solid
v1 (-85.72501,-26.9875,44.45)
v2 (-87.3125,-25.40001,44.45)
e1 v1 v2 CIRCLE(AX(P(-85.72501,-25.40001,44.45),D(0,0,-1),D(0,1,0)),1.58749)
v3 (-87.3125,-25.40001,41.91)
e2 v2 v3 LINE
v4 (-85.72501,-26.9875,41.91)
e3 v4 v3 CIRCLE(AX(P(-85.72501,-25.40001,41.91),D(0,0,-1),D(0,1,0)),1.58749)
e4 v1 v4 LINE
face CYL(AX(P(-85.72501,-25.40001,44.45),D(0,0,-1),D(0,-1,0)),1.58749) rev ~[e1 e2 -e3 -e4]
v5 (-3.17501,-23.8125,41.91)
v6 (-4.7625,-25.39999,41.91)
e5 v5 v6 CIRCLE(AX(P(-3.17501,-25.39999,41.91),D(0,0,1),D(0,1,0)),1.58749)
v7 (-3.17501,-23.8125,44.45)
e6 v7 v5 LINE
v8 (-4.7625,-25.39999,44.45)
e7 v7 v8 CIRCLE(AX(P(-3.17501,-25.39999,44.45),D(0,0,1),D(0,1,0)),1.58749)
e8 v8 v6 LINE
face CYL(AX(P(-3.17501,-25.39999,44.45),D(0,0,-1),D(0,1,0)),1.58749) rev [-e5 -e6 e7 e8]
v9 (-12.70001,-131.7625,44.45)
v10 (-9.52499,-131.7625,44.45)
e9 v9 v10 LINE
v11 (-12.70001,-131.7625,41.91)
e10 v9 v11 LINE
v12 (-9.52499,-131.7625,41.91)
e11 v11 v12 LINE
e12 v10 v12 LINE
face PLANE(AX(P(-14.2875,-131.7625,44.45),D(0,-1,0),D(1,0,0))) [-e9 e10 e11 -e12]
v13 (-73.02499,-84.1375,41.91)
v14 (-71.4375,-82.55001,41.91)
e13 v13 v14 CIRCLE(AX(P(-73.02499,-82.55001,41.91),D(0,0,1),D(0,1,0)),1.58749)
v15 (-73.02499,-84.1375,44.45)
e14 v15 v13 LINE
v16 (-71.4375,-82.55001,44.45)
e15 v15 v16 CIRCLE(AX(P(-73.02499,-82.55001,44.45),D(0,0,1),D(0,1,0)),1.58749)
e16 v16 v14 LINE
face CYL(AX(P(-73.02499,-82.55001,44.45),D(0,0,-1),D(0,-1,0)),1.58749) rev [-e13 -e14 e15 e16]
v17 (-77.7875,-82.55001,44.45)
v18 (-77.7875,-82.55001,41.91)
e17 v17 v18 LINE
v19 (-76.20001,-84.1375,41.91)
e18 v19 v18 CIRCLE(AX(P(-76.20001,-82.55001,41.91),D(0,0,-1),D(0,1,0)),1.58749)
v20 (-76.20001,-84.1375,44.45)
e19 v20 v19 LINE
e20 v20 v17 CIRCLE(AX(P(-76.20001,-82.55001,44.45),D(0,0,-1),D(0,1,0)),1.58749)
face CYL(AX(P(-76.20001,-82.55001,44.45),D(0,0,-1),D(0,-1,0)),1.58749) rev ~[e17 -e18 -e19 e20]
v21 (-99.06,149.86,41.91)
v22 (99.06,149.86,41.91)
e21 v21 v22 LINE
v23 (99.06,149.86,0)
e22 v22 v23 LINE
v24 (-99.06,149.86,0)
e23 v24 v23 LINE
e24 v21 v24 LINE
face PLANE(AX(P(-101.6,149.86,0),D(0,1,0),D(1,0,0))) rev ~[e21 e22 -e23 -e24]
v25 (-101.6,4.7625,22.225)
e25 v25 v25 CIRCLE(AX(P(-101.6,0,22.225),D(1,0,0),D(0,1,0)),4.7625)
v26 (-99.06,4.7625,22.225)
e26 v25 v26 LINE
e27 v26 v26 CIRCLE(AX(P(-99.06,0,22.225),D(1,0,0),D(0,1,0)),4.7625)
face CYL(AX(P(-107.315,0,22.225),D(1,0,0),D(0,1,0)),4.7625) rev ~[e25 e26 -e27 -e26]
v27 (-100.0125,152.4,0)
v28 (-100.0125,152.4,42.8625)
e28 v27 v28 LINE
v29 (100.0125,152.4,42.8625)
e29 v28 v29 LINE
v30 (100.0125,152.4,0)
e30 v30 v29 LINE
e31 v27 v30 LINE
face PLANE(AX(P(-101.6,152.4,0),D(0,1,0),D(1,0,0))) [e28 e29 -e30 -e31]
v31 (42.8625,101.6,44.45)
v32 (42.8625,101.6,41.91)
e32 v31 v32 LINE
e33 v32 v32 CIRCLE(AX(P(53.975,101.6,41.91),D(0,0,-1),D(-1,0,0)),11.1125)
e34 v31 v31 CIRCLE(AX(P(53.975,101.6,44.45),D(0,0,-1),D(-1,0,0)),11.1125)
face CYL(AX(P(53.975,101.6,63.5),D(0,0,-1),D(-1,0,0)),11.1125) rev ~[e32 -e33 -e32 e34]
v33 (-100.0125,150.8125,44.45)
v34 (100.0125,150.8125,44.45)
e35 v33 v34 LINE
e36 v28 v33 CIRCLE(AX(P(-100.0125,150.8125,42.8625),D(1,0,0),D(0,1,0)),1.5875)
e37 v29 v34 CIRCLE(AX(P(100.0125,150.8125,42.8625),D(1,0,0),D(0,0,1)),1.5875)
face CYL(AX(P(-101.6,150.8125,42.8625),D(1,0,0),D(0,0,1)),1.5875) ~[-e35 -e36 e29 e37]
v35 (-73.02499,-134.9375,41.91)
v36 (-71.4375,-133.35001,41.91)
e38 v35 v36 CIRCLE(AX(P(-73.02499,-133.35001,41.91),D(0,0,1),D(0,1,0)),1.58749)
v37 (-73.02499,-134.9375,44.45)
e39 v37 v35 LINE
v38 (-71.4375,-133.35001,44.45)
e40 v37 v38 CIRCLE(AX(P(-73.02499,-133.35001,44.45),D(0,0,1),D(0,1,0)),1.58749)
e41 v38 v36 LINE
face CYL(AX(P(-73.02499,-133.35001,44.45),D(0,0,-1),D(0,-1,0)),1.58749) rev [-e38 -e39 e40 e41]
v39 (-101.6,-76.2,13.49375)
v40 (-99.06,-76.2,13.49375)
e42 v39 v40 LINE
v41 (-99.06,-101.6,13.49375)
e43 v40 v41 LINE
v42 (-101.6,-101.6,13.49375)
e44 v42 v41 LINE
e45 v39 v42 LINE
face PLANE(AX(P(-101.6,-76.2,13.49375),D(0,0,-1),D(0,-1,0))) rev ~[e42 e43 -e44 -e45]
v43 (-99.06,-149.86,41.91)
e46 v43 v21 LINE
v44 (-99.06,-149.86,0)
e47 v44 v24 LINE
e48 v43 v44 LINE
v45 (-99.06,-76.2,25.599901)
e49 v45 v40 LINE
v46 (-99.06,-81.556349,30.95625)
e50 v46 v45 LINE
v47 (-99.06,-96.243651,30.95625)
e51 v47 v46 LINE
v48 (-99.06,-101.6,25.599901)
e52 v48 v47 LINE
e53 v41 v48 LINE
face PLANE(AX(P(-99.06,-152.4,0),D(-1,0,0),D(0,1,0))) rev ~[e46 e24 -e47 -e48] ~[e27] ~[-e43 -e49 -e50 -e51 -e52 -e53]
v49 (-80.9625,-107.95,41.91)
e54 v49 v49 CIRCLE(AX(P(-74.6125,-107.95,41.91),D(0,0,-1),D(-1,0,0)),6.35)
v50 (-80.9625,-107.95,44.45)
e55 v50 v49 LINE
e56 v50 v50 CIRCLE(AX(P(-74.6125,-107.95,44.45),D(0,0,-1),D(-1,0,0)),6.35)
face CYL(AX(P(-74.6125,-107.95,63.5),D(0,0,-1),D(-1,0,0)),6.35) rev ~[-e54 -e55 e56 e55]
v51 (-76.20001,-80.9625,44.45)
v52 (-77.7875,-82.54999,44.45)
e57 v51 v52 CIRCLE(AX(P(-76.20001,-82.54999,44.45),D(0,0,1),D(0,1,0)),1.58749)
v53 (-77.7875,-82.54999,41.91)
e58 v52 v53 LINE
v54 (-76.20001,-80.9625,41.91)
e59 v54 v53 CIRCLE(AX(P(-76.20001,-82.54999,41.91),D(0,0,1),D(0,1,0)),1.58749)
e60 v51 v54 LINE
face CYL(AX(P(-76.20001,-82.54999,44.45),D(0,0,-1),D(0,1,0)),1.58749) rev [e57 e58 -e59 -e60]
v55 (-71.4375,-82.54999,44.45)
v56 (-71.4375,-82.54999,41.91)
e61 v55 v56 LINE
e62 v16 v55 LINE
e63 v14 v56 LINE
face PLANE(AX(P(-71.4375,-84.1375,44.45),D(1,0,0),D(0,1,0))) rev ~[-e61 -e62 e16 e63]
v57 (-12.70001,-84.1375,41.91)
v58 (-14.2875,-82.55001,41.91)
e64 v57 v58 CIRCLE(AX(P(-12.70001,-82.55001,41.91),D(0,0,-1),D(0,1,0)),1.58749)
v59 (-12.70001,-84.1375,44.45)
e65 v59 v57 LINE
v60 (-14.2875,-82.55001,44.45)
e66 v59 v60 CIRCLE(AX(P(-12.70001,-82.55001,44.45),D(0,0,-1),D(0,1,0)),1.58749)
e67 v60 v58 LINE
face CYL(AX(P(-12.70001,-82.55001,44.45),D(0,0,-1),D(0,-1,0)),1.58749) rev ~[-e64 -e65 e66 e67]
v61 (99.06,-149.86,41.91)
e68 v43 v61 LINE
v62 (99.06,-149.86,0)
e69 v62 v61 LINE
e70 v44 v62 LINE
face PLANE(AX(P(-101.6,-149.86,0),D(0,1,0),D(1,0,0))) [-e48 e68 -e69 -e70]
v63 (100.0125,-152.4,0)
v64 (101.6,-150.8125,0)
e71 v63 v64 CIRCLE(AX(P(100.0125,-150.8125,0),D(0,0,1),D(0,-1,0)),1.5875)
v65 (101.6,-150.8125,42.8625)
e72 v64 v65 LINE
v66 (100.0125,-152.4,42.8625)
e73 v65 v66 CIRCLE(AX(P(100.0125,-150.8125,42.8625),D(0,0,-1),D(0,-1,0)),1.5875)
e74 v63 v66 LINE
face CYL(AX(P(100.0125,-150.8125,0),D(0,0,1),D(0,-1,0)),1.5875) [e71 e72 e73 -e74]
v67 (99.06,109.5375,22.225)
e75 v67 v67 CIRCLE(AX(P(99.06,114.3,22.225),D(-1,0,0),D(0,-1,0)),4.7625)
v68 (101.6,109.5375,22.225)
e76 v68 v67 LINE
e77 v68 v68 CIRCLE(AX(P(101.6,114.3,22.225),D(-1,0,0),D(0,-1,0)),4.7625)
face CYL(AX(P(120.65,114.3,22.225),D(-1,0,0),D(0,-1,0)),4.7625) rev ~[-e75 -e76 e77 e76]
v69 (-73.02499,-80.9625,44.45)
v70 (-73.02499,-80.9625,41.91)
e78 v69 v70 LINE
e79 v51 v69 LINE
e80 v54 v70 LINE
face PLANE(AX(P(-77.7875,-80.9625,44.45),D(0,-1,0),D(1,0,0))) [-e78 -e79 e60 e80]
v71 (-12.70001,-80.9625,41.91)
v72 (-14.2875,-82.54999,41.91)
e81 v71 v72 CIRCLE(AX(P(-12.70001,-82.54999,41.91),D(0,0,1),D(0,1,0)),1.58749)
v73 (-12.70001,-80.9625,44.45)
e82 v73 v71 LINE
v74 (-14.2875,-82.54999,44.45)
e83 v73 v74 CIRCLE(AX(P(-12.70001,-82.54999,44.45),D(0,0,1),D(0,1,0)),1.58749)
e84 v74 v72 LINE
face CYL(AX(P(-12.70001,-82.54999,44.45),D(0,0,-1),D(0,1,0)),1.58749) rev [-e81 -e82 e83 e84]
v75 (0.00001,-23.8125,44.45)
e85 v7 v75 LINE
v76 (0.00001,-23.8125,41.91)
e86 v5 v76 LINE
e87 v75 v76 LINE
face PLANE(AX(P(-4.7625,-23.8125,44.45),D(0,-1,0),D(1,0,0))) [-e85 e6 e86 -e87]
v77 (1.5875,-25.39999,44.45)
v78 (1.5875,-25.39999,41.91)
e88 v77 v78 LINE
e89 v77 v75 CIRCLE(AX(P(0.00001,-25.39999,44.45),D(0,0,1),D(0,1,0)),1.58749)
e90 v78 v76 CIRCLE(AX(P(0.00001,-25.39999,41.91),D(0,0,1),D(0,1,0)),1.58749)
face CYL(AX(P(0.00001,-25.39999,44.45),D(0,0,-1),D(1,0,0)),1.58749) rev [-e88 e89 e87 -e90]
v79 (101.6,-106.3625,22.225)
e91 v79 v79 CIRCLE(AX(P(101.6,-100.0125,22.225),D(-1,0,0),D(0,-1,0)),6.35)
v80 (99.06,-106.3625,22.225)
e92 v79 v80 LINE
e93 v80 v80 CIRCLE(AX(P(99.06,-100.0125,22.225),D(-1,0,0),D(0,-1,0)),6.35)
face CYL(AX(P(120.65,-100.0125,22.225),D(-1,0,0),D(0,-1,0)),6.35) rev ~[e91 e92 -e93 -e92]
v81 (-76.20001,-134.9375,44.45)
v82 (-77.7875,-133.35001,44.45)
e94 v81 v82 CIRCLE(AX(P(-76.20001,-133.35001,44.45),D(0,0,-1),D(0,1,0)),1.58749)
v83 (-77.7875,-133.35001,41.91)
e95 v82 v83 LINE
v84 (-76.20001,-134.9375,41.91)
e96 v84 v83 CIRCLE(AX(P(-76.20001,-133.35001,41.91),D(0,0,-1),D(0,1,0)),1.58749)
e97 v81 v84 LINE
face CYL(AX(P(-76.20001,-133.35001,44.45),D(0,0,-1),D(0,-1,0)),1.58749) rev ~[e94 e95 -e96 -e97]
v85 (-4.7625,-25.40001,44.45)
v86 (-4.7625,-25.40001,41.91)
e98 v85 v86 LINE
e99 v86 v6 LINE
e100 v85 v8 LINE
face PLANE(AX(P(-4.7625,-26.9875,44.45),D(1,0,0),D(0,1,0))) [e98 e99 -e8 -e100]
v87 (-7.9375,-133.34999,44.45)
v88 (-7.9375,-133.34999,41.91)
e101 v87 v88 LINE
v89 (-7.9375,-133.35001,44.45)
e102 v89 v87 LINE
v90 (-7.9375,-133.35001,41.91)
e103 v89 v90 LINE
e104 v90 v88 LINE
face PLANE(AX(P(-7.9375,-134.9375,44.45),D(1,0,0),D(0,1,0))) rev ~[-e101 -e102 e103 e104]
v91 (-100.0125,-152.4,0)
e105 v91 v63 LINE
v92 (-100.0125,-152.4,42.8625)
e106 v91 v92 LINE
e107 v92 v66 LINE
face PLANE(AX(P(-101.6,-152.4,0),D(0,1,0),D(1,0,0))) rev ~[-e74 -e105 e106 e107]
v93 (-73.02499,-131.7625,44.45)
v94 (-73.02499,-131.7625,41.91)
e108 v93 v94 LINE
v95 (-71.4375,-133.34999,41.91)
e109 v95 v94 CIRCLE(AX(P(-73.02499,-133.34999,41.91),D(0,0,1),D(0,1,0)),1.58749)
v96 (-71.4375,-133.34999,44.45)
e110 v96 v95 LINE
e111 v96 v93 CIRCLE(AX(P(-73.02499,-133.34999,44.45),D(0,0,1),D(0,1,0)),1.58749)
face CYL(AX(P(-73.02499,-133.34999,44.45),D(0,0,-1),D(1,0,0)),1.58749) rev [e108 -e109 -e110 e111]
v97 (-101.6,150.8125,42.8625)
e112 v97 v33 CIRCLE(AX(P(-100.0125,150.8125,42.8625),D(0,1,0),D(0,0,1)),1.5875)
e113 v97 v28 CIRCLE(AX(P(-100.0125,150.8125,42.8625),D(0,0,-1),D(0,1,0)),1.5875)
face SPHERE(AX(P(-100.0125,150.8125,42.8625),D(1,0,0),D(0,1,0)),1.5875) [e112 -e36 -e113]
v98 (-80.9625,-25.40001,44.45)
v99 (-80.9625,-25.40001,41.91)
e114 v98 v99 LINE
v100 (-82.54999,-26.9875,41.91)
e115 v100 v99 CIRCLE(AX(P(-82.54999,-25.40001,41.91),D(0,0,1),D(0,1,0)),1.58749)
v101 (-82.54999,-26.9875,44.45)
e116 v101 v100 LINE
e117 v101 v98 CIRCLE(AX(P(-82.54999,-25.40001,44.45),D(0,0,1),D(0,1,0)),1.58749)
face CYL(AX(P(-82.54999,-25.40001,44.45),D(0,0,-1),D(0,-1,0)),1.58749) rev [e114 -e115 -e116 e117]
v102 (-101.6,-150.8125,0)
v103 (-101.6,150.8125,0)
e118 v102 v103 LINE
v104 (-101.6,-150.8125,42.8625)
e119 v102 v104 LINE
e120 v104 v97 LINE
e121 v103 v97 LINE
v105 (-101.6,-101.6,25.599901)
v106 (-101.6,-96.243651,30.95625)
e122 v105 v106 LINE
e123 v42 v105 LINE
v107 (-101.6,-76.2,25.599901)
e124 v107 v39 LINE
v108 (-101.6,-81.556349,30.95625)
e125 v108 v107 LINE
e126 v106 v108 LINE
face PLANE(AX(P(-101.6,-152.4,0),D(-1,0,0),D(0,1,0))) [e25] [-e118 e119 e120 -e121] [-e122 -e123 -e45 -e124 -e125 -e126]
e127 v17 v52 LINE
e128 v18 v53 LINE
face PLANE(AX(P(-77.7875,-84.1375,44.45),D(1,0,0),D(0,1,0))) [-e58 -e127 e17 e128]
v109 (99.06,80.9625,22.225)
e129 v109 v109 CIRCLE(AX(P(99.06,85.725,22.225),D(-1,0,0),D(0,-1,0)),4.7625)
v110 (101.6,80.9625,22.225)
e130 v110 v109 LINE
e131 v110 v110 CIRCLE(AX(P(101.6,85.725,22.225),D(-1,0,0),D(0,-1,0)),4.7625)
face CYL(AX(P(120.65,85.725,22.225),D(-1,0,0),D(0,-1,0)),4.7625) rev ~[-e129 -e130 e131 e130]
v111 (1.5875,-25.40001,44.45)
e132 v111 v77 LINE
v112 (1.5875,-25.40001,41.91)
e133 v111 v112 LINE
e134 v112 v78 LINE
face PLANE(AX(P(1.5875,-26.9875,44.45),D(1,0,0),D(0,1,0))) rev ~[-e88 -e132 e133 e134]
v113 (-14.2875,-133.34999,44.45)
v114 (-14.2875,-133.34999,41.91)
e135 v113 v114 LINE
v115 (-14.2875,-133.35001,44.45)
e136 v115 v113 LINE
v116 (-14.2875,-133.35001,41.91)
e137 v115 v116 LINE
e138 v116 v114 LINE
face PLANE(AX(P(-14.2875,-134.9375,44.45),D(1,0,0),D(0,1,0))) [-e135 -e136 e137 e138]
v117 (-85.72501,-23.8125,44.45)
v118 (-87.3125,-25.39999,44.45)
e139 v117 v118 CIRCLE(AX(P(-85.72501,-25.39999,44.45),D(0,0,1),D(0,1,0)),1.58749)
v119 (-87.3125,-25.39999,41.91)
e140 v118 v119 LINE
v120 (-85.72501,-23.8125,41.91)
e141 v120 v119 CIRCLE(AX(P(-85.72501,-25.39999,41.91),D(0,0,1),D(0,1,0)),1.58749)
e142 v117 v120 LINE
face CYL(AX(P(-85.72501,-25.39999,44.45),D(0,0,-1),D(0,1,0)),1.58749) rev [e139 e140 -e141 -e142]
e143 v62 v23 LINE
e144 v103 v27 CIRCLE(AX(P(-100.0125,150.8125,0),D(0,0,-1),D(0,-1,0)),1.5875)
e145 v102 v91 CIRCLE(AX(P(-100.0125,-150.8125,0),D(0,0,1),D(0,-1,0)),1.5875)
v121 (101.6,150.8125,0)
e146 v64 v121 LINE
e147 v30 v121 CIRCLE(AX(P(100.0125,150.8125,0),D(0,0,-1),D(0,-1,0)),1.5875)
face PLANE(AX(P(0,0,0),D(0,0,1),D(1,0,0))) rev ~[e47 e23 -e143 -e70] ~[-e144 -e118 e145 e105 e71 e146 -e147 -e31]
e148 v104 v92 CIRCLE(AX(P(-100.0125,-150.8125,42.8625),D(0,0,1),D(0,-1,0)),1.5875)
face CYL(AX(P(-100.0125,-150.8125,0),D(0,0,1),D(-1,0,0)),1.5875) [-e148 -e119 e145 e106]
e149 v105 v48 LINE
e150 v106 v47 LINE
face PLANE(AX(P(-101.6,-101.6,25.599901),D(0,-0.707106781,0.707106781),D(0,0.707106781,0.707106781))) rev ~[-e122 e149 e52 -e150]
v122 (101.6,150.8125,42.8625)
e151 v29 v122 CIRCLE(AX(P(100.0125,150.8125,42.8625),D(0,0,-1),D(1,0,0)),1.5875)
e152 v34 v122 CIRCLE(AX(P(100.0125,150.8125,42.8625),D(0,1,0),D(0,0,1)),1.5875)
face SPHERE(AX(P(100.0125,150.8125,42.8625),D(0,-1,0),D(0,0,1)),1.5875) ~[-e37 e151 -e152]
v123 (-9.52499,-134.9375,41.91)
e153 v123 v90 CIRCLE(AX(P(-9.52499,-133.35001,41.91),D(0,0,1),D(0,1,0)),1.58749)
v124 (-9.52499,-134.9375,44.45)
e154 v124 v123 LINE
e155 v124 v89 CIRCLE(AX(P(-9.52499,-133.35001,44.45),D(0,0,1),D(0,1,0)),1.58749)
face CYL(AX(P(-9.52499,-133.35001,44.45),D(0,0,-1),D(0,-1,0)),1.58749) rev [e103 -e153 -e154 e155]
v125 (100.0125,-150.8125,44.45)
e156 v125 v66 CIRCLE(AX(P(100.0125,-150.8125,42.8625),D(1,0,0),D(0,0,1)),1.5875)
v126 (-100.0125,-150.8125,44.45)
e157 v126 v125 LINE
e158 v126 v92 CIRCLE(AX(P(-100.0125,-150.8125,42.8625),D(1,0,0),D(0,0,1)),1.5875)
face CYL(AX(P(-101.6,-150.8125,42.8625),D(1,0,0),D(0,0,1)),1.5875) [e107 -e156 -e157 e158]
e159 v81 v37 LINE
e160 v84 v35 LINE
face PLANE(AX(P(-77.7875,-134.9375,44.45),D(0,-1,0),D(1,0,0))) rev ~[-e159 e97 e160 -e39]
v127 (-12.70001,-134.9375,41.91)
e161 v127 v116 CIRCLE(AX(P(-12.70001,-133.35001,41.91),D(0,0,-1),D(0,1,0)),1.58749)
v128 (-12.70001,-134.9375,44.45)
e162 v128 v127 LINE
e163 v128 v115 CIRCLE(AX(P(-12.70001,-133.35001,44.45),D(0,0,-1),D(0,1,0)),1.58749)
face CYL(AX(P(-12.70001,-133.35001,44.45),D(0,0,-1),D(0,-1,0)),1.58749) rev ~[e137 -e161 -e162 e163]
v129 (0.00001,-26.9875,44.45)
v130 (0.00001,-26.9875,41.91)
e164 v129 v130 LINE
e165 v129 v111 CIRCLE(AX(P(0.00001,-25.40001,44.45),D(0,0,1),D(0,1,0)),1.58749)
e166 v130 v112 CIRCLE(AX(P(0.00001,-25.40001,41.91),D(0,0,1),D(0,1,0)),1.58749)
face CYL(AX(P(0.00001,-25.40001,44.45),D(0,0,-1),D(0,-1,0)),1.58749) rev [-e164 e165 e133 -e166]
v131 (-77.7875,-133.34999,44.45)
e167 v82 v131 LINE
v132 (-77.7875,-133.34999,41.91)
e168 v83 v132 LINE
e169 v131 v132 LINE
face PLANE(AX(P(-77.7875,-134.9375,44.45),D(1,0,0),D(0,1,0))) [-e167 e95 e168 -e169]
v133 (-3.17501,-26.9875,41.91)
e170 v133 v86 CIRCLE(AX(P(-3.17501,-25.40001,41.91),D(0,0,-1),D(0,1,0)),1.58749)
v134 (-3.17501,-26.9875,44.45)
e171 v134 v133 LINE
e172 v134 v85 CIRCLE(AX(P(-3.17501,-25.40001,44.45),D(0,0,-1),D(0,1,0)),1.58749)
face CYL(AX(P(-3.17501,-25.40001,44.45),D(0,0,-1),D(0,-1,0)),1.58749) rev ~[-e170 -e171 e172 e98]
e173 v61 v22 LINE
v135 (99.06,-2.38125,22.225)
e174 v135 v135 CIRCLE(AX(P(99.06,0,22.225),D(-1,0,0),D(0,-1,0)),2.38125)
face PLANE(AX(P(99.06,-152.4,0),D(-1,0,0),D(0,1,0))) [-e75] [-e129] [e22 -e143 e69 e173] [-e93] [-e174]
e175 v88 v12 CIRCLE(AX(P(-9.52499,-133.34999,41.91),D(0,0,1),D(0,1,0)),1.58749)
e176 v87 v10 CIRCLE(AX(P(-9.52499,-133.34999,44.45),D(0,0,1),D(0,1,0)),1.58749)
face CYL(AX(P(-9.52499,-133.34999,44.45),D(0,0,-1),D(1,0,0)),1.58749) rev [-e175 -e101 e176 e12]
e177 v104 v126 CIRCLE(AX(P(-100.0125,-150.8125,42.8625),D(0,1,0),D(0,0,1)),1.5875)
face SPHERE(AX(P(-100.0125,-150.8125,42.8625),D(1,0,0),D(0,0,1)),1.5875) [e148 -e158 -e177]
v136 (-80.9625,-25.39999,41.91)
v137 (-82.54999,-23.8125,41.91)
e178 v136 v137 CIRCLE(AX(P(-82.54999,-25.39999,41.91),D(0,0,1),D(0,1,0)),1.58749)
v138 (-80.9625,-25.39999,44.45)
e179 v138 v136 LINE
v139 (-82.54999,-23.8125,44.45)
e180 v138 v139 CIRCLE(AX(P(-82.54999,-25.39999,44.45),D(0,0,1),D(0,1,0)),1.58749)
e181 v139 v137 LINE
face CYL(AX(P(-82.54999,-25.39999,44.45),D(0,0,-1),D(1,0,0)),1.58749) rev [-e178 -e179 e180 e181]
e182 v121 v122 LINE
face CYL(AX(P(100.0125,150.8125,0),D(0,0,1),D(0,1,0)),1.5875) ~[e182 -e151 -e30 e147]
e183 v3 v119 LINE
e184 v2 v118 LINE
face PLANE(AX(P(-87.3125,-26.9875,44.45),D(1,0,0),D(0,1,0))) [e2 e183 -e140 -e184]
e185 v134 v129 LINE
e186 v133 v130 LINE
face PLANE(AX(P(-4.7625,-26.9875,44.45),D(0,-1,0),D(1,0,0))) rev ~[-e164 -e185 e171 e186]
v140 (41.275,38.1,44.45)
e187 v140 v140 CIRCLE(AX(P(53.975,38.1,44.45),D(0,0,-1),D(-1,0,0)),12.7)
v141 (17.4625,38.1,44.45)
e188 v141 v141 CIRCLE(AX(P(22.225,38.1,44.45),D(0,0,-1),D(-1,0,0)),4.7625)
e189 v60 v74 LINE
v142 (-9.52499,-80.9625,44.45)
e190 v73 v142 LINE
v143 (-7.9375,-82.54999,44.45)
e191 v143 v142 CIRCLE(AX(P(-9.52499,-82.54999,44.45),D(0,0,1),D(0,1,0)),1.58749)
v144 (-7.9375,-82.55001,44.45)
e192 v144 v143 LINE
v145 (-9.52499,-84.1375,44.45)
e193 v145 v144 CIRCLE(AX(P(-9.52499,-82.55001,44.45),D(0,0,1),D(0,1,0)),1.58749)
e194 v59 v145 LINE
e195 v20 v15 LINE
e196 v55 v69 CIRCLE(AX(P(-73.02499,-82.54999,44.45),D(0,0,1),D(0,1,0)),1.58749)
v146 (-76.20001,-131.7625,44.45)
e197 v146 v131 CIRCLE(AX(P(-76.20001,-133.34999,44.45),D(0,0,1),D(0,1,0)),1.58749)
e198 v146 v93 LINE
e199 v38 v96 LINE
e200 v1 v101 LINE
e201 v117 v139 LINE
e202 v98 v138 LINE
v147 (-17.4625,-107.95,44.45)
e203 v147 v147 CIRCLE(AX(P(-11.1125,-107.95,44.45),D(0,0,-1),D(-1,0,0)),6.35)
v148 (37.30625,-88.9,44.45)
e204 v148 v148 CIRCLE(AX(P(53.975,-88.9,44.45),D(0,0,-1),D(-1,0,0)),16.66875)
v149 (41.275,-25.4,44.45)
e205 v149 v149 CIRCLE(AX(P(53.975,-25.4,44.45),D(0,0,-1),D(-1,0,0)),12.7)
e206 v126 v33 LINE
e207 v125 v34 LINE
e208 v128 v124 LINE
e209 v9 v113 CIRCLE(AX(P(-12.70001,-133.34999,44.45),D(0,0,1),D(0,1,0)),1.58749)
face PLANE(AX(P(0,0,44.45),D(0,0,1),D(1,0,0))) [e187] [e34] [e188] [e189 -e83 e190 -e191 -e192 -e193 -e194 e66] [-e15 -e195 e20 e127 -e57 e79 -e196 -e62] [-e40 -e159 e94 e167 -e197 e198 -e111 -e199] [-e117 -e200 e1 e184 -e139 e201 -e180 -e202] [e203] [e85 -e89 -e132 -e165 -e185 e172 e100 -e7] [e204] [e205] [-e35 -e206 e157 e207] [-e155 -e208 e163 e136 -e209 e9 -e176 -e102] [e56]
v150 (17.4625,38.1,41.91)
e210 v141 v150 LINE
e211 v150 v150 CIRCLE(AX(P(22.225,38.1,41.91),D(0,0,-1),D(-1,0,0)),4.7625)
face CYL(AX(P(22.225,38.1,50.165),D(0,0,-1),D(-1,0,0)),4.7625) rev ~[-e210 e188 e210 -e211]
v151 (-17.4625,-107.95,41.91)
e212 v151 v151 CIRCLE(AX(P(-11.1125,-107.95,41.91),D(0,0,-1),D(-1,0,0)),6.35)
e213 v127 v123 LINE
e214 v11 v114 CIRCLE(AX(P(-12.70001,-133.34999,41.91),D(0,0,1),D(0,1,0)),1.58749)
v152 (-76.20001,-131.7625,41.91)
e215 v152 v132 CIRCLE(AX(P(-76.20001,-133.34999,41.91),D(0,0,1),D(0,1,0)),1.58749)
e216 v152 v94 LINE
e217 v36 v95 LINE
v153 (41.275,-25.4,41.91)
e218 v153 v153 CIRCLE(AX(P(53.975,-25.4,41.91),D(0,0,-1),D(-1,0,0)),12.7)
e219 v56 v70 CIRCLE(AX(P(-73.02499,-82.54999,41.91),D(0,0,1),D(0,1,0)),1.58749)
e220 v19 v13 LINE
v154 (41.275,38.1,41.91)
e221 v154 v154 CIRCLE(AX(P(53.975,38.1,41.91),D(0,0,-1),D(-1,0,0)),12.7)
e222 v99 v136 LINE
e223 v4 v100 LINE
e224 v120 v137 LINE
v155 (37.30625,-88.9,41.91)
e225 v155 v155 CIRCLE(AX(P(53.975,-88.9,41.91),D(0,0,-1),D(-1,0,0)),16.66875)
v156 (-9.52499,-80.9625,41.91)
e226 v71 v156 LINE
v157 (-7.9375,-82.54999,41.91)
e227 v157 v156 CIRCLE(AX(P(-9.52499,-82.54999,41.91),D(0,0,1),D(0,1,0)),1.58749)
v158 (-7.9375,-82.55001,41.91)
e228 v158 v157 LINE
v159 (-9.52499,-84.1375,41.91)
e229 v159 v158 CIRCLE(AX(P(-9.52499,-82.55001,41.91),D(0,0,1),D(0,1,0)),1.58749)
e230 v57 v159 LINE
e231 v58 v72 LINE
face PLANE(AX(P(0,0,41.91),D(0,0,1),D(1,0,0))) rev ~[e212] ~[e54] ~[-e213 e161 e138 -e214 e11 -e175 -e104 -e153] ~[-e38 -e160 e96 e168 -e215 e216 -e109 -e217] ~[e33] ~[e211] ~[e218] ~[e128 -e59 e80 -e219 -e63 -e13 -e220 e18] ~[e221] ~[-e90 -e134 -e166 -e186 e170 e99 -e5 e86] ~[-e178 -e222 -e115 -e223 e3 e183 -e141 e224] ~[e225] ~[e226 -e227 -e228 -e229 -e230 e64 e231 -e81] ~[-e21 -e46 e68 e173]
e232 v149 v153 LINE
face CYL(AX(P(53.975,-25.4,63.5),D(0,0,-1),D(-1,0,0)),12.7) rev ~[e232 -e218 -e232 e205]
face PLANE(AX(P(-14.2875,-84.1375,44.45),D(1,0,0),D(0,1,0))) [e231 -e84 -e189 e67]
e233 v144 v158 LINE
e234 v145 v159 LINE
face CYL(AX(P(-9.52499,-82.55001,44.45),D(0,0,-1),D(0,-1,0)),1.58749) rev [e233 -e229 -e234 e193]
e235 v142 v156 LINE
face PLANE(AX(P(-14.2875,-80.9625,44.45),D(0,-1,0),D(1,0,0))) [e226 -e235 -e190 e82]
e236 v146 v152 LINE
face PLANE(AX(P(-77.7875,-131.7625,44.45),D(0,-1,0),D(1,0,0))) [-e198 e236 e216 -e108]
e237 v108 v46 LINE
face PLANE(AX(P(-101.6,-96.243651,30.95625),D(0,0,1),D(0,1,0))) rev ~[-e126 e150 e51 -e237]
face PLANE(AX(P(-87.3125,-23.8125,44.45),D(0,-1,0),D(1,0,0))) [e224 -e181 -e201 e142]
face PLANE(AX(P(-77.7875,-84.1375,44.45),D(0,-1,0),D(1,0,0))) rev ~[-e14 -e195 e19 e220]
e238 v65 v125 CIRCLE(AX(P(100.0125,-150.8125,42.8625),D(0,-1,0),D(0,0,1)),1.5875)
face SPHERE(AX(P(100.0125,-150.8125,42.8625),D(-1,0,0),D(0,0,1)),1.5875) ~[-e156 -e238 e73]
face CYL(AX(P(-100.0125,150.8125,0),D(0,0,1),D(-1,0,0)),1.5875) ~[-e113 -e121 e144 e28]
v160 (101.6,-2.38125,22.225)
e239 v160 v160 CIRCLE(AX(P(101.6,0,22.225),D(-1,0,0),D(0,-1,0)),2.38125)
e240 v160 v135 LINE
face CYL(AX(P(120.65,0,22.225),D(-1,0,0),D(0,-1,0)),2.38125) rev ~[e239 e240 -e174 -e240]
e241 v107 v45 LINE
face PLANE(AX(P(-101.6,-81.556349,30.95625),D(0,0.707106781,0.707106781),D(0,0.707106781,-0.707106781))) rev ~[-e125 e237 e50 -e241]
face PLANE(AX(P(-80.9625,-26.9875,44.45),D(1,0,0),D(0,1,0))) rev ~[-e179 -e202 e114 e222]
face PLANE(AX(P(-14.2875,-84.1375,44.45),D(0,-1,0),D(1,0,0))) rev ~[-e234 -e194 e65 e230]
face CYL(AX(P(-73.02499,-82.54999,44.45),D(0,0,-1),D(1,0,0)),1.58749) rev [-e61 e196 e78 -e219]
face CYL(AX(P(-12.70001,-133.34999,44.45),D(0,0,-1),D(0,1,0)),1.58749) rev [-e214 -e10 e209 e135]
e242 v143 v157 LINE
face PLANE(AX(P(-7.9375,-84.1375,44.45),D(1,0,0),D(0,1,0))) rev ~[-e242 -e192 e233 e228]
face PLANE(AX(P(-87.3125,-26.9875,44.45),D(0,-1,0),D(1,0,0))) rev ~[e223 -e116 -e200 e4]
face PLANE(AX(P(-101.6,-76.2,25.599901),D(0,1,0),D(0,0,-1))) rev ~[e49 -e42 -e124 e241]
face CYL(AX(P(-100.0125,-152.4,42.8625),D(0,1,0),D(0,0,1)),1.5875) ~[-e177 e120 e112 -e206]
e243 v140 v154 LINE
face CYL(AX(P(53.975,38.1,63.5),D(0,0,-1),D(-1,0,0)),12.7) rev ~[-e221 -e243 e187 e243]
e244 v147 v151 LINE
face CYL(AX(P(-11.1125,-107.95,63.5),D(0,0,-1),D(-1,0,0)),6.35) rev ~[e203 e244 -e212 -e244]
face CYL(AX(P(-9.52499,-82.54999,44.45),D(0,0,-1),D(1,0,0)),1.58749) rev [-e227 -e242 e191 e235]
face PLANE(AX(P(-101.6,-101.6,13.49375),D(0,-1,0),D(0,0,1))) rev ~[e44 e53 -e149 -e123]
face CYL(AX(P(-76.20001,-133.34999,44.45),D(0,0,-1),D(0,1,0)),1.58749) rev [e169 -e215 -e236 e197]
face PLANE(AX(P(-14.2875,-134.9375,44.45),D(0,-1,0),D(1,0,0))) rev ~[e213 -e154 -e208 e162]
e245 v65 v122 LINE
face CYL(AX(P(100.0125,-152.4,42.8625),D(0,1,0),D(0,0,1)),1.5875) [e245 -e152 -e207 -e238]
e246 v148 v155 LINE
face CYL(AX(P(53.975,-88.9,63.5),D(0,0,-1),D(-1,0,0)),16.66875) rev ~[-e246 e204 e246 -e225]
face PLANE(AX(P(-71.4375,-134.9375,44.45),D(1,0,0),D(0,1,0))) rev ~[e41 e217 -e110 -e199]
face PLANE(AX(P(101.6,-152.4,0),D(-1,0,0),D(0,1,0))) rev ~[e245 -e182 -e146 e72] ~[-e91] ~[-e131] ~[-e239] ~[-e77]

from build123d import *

# Parameters (mm, degrees)
F0_W      = 203.2
F0_H      = 304.8
F1_DEPTH  = 44.45
F2_T      = -2.54
F3_W      = 6.35
F3_H      = 3.175
F4_DEPTH  = 25.4
F5_R      = 1.58749
F7_D      = 33.3375
F7_DEPTH  = 19.05
F7_TIP    = 10.0155954434
F8_D      = 25.4
F8_DEPTH  = 19.05
F8_TIP    = 7.6309298617
F9_D      = 22.225
F9_DEPTH  = 19.05
F9_TIP    = 6.6770636289
F11_D     = 4.7625
F11_DEPTH = 19.05
F11_TIP   = 1.4307993491
F12_D     = 9.525
F12_DEPTH = 19.05
F12_TIP   = 2.8615986981
F13_D     = 12.7
F13_DEPTH = 19.05
F13_TIP   = 3.8154649308
F15_DEPTH = 25.4
F16_D     = 12.7
F16_DEPTH = 19.05
F16_TIP   = 3.8154649308
F17_W     = 6.35
F17_H     = 3.175
F18_DEPTH = 25.4
F19_R     = 1.58749
F20_D     = 9.525
F20_DEPTH = 5.715
F20_TIP   = 2.8615986981
F21_D     = 9.525
F21_DEPTH = 5.715
F21_TIP   = 2.8615986981
F22_R     = 1.5875


# Not quite as in the source:
# - a fillet or chamfer is up to 0.001 mm smaller than in the source, because OpenCascade refuses the exact size


with BuildPart() as f1:
    # F0 (on Top) → F1 (new body)
    with BuildSketch(Plane.XY):
        Rectangle(F0_W, F0_H)
    extrude(amount=F1_DEPTH)

    # F2
    f2_openings = [f1.faces().sort_by_distance(p)[0] for p in [
        (0, 0, 0),
    ]]
    offset(amount=F2_T, openings=f2_openings)

    # F3 (on face) → F4 (cut)
    with BuildSketch(Plane.XY.offset(44.45)):
        with Locations((-74.6125, -133.35)):
            Rectangle(F3_W, F3_H)
        with Locations((-74.6125, -82.55)):
            Rectangle(F3_W, F3_H)
        with Locations((-11.1125, -82.55)):
            Rectangle(F3_W, F3_H)
        with Locations((-11.1125, -133.35)):
            Rectangle(F3_W, F3_H)
    extrude(amount=-F4_DEPTH, mode=Mode.SUBTRACT)

    # F5 (radius 1.5875 in the source; OpenCascade refuses exactly that, so slightly less here)
    f5_edges = [f1.edges().sort_by_distance(p)[0] for p in [
        (-77.7875, -131.7625, 43.18),
        (-14.2875, -131.7625, 43.18),
        (-77.7875, -80.9625, 43.18),
        (-71.4375, -80.9625, 43.18),
        (-7.9375, -80.9625, 43.18),
        (-7.9375, -131.7625, 43.18),
        (-71.4375, -131.7625, 43.18),
        (-14.2875, -134.9375, 43.18),
        (-77.7875, -134.9375, 43.18),
        (-77.7875, -84.1375, 43.18),
        (-14.2875, -84.1375, 43.18),
        (-7.9375, -134.9375, 43.18),
        (-7.9375, -84.1375, 43.18),
        (-71.4375, -84.1375, 43.18),
        (-71.4375, -134.9375, 43.18),
        (-14.2875, -80.9625, 43.18),
    ]]
    fillet(f5_edges, radius=F5_R)

    # F7
    with Locations(Plane.XY.offset(44.45)):
        with Locations((53.975, -88.9)):
            Hole(F7_D / 2, depth=F7_DEPTH)
            with Locations((0, 0, -(F7_DEPTH + F7_TIP / 2))):  # 118° drill point
                Cone(0, F7_D / 2, F7_TIP, mode=Mode.SUBTRACT)

    # F8
    with Locations(Plane.XY.offset(44.45)):
        with Locations((53.975, -25.4), (53.975, 38.1)):
            Hole(F8_D / 2, depth=F8_DEPTH)
            with Locations((0, 0, -(F8_DEPTH + F8_TIP / 2))):  # 118° drill point
                Cone(0, F8_D / 2, F8_TIP, mode=Mode.SUBTRACT)

    # F9
    with Locations(Plane.XY.offset(44.45)):
        with Locations((53.975, 101.6)):
            Hole(F9_D / 2, depth=F9_DEPTH)
            with Locations((0, 0, -(F9_DEPTH + F9_TIP / 2))):  # 118° drill point
                Cone(0, F9_D / 2, F9_TIP, mode=Mode.SUBTRACT)

    # F11
    with Locations(Plane.YZ.offset(101.6)):
        with Locations((0, 22.225)):
            Hole(F11_D / 2, depth=F11_DEPTH)
            with Locations((0, 0, -(F11_DEPTH + F11_TIP / 2))):  # 118° drill point
                Cone(0, F11_D / 2, F11_TIP, mode=Mode.SUBTRACT)

    # F12
    with Locations(Plane.YZ.offset(101.6)):
        with Locations((85.725, 22.225), (114.3, 22.225)):
            Hole(F12_D / 2, depth=F12_DEPTH)
            with Locations((0, 0, -(F12_DEPTH + F12_TIP / 2))):  # 118° drill point
                Cone(0, F12_D / 2, F12_TIP, mode=Mode.SUBTRACT)

    # F13
    with Locations(Plane.YZ.offset(101.6)):
        with Locations((-100.0125, 22.225)):
            Hole(F13_D / 2, depth=F13_DEPTH)
            with Locations((0, 0, -(F13_DEPTH + F13_TIP / 2))):  # 118° drill point
                Cone(0, F13_D / 2, F13_TIP, mode=Mode.SUBTRACT)

    # F14 (on face) → F15 (cut)
    with BuildSketch(Plane(origin=(-101.6, 0, 0), x_dir=(0, -1, 0), z_dir=(-1, 0, 0))):
        Polygon((101.6, 25.5999010921), (96.2436510921, 30.95625), (81.5563489079, 30.95625), (76.2, 25.5999010921), (76.2, 18.8500989079), (81.5563489079, 13.49375), (96.2436510921, 13.49375), (101.6, 18.8500989079), align=None)
        Polygon((81.5563489079, 13.49375), (76.2, 18.8500989079), (76.2, 13.49375), align=None)
        Polygon((101.6, 13.49375), (101.6, 18.8500989079), (96.2436510921, 13.49375), align=None)
    extrude(amount=-F15_DEPTH, mode=Mode.SUBTRACT)

    # F16
    with Locations(Plane.XY.offset(44.45)):
        with Locations((-74.6125, -107.95), (-11.1125, -107.95)):
            Hole(F16_D / 2, depth=F16_DEPTH)
            with Locations((0, 0, -(F16_DEPTH + F16_TIP / 2))):  # 118° drill point
                Cone(0, F16_D / 2, F16_TIP, mode=Mode.SUBTRACT)

    # F17 (on face) → F18 (cut)
    with BuildSketch(Plane.XY.offset(44.45)):
        with Locations((-84.1375, -25.4)):
            Rectangle(F17_W, F17_H)
        with Locations((-1.5875, -25.4)):
            Rectangle(F17_W, F17_H)
    extrude(amount=-F18_DEPTH, mode=Mode.SUBTRACT)

    # F19 (radius 1.5875 in the source; OpenCascade refuses exactly that, so slightly less here)
    f19_edges = [f1.edges().sort_by_distance(p)[0] for p in [
        (-87.3125, -23.8125, 43.18),
        (-4.7625, -23.8125, 43.18),
        (-80.9625, -23.8125, 43.18),
        (1.5875, -23.8125, 43.18),
        (-87.3125, -26.9875, 43.18),
        (-4.7625, -26.9875, 43.18),
        (-80.9625, -26.9875, 43.18),
        (1.5875, -26.9875, 43.18),
    ]]
    fillet(f19_edges, radius=F19_R)

    # F20
    with Locations(Plane(origin=(-101.6, 0, 0), x_dir=(0, -1, 0), z_dir=(-1, 0, 0))):
        with Locations((0, 22.225)):
            Hole(F20_D / 2, depth=F20_DEPTH)
            with Locations((0, 0, -(F20_DEPTH + F20_TIP / 2))):  # 118° drill point
                Cone(0, F20_D / 2, F20_TIP, mode=Mode.SUBTRACT)

    # F21
    with Locations(Plane.XY.offset(44.45)):
        with Locations((22.225, 38.1)):
            Hole(F21_D / 2, depth=F21_DEPTH)
            with Locations((0, 0, -(F21_DEPTH + F21_TIP / 2))):  # 118° drill point
                Cone(0, F21_D / 2, F21_TIP, mode=Mode.SUBTRACT)

    # F22
    f22_edges = [f1.edges().sort_by_distance(p)[0] for p in [
        (0, -152.4, 44.45),
        (101.6, 0, 44.45),
        (101.6, -152.4, 22.225),
        (0, 152.4, 44.45),
        (101.6, 152.4, 22.225),
        (-101.6, 152.4, 22.225),
        (-101.6, 0, 44.45),
        (-101.6, -152.4, 22.225),
    ]]
    fillet(f22_edges, radius=F22_R)


solid = f1.part
